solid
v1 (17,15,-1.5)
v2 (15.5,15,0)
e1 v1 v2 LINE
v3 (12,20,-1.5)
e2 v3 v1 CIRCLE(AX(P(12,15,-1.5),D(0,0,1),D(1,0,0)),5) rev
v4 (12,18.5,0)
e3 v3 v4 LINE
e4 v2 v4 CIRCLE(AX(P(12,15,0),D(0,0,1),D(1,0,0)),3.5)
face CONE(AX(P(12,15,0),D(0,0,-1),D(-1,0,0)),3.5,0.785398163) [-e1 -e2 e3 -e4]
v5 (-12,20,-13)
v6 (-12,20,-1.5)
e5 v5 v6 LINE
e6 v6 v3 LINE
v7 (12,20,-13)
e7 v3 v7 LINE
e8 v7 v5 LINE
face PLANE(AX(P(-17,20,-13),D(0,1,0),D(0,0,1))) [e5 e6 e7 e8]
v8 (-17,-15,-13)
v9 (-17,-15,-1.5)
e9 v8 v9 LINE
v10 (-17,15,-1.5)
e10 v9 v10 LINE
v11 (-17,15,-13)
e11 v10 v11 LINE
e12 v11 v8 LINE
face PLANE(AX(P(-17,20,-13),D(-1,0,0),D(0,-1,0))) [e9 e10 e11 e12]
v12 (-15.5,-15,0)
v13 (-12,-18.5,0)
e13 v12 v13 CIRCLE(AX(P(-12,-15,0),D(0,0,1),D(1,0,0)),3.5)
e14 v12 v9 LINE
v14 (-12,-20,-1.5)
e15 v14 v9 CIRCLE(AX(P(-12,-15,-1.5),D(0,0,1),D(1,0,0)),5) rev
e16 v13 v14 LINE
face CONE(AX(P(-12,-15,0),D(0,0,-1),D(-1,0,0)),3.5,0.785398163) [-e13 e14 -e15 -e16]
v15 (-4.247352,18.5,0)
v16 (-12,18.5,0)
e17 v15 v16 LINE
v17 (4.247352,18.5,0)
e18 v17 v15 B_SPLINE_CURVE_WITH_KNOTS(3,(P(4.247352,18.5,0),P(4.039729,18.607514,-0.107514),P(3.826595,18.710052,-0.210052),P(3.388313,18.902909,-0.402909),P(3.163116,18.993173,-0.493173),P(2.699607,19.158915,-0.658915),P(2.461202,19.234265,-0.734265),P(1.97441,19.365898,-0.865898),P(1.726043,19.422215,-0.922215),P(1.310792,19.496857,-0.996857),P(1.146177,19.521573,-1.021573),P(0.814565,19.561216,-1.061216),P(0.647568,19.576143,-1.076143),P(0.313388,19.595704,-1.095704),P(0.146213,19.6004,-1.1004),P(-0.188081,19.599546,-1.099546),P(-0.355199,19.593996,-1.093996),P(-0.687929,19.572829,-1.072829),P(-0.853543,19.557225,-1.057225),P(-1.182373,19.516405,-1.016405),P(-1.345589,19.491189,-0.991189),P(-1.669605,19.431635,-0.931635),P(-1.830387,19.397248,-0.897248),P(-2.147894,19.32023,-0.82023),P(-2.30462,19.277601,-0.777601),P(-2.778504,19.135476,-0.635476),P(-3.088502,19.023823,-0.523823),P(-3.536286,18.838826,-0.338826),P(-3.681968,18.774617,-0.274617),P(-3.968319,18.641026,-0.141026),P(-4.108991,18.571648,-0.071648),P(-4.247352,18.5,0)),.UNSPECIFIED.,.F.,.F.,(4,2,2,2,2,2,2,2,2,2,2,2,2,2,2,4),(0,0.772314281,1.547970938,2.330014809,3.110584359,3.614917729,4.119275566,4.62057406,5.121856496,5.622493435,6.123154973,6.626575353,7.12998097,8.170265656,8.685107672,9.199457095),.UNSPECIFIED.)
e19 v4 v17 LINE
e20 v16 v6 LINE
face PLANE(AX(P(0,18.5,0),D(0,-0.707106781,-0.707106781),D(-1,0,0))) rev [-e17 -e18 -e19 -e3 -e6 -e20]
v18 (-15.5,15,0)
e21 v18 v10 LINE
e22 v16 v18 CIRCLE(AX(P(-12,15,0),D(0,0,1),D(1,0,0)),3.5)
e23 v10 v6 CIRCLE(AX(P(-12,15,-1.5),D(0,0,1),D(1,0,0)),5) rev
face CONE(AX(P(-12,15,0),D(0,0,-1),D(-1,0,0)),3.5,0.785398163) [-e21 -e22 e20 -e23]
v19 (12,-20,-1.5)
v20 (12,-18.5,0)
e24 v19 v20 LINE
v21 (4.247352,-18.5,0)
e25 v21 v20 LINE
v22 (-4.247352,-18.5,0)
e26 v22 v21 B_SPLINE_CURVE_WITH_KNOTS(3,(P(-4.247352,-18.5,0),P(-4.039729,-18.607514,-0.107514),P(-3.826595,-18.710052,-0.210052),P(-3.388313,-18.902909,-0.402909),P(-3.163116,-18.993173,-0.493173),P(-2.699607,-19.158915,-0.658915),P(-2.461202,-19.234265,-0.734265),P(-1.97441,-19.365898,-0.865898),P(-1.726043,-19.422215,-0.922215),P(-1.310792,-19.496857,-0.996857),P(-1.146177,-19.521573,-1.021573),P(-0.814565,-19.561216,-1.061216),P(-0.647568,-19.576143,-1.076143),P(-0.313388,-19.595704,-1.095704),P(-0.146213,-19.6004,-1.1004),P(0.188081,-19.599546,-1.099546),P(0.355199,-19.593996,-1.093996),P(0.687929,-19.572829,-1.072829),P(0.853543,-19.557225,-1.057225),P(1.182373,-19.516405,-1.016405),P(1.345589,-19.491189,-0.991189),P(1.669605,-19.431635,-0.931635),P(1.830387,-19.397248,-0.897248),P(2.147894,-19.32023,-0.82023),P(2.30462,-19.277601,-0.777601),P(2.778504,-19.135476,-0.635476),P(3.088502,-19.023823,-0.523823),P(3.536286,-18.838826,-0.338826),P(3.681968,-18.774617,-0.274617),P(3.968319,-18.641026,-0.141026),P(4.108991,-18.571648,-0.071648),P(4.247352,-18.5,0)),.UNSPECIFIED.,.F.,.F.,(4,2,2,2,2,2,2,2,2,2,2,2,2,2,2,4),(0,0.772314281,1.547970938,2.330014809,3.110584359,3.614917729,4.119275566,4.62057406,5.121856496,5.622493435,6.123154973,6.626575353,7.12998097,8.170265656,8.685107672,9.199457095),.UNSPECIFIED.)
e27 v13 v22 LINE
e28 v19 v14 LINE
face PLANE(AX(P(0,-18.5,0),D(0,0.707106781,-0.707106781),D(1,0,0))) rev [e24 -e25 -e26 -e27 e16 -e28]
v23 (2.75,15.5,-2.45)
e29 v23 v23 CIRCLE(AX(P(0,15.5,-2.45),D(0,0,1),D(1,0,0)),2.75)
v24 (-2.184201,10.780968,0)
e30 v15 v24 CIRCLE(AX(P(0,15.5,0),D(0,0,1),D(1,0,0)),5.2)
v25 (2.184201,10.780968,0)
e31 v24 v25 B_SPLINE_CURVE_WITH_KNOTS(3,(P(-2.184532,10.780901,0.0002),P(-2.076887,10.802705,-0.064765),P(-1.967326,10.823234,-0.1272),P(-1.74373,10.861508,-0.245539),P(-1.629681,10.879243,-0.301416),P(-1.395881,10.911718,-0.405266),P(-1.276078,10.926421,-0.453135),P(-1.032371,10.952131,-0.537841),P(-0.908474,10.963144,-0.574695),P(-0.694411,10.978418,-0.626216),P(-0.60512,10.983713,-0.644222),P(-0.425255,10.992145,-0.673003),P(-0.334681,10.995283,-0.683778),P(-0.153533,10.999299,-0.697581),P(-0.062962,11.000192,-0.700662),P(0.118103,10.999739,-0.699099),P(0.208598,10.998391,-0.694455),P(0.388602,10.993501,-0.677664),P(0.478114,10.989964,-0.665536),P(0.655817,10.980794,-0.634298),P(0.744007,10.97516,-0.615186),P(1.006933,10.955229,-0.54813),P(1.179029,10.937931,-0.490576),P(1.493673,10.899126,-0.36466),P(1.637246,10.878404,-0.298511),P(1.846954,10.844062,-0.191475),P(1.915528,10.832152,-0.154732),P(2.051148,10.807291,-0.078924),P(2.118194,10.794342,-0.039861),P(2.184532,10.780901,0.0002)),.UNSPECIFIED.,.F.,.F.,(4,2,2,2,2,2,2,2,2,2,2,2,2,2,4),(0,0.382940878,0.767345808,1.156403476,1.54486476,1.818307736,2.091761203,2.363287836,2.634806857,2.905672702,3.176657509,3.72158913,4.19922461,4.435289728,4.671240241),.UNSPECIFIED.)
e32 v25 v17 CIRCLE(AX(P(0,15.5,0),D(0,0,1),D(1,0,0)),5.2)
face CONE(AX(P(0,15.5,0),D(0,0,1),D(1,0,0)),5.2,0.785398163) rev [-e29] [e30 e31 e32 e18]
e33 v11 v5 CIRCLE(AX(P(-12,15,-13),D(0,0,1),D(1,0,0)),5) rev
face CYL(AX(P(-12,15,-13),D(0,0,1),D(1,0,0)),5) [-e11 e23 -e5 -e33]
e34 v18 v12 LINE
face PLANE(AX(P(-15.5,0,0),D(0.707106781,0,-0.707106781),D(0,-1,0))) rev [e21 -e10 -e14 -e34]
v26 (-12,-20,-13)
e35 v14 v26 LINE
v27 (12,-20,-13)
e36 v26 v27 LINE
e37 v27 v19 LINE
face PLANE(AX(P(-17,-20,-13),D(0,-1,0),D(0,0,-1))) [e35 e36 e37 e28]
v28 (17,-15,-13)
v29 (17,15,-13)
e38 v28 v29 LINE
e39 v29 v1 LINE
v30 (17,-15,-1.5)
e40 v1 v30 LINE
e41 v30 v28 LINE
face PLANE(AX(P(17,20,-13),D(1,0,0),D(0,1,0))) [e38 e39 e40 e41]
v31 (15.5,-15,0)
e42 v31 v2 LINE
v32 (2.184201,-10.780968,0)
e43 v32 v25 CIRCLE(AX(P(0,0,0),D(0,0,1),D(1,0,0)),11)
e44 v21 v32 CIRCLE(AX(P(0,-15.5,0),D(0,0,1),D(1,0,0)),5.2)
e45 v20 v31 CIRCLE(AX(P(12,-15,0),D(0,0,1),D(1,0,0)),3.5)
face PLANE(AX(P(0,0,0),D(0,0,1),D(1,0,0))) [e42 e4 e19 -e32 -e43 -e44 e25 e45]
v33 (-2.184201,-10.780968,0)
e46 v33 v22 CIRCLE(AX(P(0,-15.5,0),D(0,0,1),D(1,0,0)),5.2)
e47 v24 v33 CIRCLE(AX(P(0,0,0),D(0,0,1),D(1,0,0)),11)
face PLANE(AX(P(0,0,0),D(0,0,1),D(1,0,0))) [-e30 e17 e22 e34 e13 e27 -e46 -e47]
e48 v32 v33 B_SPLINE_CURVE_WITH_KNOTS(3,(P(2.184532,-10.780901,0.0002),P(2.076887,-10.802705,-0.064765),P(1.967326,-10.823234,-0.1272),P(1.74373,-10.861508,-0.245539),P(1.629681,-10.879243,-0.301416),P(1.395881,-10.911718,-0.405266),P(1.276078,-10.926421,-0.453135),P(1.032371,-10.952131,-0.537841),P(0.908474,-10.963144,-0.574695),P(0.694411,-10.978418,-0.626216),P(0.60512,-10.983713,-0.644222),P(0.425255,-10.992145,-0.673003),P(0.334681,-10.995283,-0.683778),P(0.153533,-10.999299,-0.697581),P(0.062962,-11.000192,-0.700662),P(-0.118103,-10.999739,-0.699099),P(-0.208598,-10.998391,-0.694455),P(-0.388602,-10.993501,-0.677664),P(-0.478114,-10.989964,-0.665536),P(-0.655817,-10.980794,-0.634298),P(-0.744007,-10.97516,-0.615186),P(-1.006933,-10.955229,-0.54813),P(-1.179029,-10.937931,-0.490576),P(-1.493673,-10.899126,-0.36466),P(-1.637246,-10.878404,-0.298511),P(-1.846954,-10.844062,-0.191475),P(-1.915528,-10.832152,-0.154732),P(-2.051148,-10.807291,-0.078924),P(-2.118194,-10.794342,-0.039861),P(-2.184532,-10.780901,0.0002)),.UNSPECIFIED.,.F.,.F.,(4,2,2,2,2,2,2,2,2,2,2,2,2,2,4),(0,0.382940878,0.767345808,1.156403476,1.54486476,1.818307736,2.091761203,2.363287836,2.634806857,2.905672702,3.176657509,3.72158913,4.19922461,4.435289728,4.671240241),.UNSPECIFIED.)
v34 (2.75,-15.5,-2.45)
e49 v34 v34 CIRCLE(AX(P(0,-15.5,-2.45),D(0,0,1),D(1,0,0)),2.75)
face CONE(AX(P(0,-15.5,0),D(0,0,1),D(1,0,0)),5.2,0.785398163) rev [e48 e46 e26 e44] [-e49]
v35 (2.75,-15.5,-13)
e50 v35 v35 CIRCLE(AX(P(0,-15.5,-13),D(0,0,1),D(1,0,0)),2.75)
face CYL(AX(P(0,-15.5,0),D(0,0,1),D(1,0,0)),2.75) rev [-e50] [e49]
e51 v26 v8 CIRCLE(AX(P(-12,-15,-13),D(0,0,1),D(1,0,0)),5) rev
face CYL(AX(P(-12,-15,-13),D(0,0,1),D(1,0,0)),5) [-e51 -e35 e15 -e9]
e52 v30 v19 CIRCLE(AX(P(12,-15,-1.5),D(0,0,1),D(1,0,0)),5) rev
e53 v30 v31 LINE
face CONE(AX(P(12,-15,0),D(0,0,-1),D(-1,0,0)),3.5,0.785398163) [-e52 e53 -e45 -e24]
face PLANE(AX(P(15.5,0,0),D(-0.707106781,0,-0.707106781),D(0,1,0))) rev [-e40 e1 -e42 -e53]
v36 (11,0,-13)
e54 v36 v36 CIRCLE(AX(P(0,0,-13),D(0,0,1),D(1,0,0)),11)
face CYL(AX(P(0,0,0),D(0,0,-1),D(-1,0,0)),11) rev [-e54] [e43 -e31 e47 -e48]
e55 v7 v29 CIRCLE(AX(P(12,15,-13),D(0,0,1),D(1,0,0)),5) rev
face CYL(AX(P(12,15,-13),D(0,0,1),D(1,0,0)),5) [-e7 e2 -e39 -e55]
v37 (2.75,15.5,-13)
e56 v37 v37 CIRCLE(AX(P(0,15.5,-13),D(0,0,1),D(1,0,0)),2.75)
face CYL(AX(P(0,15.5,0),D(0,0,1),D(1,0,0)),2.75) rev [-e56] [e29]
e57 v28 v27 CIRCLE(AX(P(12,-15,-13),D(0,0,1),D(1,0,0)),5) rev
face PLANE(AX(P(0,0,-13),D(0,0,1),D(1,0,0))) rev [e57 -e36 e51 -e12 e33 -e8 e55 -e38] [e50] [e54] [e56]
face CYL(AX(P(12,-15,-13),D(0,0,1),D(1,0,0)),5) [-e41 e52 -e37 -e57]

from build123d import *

# Parameters (mm, degrees)
SKETCH_1_W                 = 34
SKETCH_1_H                 = 40
EXTRUDE_273_DEPTH          = 13
SKETCH_2_R                 = 11
CUT_EXTRUDE_457_DEPTH      = 13
HOLE_WIZARD_M6_D           = 5.5
HOLE_WIZARD_M6_CSINK_D     = 10.4
HOLE_WIZARD_M6_CSINK_ANGLE = 90
FILLET_1404_R              = 5
CHAMFER_1_SIZE             = 1.5


with BuildPart() as part:
    # Эскиз1 → Extrude 273 (new body)
    with BuildSketch(Plane.XY):
        Rectangle(SKETCH_1_W, SKETCH_1_H)
    extrude(amount=-EXTRUDE_273_DEPTH)

    # Эскиз2 → Cut-Extrude 457 (cut)
    with BuildSketch(Plane.XY.offset(-13)):
        with Locations(Location((0, 0, 0), (0, 0, 180))):
            Circle(SKETCH_2_R)
    extrude(amount=CUT_EXTRUDE_457_DEPTH, mode=Mode.SUBTRACT)

    # КреплениеM6 (through all)
    with Locations(Plane.XY):
        with Locations((0, 15.5), (0, -15.5)):
            CounterSinkHole(HOLE_WIZARD_M6_D / 2, HOLE_WIZARD_M6_CSINK_D / 2, counter_sink_angle=HOLE_WIZARD_M6_CSINK_ANGLE)

    # Fillet 1404
    fillet_1404_edges = [part.edges().sort_by_distance(p)[0] for p in [
        (17, -20, -6.5),
        (-17, -20, -6.5),
        (-17, 20, -6.5),
        (17, 20, -6.5),
    ]]
    fillet(fillet_1404_edges, radius=FILLET_1404_R)

    # Фаска1
    # the kernel refuses this chamfer: 1.5 mm, written as the material it takes off along each edge
    with BuildSketch(Plane(origin=(-12, -15, 0), x_dir=(-1, 0, 0), z_dir=(0, 1, 0))) as chamfer_1_piece_1:
        Polygon((5 - CHAMFER_1_SIZE, 0), (5, -CHAMFER_1_SIZE), (5, 0), align=None)
    revolve(axis=Axis((-12, -15, 0), (0, 0, 1)), revolution_arc=90, mode=Mode.SUBTRACT)
    with BuildSketch(Plane(origin=(1.251761638, -20, 0), x_dir=(0, 0.9996219169112968, 0.02749587661058636), z_dir=(-1, 0, 0)), Plane(origin=(12, -20, 0), x_dir=(0, 0.9996219169112968, 0.02749587661058636), z_dir=(-1, 0, 0))) as chamfer_1_piece_2:
        Polygon((CHAMFER_1_SIZE * 0.999621916911, CHAMFER_1_SIZE * 0.0274958766106), (-CHAMFER_1_SIZE * 0.0274958766106, CHAMFER_1_SIZE * 0.999621916911), (0, 0), align=None)
    extrude(amount=13.251761638, mode=Mode.SUBTRACT)
    with BuildSketch(Plane(origin=(12, -15, 0), x_dir=(0, -1, 0), z_dir=(-1, 0, 0))) as chamfer_1_piece_3:
        Polygon((5 - CHAMFER_1_SIZE, 0), (5, -CHAMFER_1_SIZE), (5, 0), align=None)
    revolve(axis=Axis((12, -15, 0), (0, 0, 1)), revolution_arc=90, mode=Mode.SUBTRACT)
    with BuildSketch(Plane(origin=(17, 15, 0), x_dir=(-0.9996219169112968, 0, 0.02749587661058636), z_dir=(0, -1, 0)), Plane(origin=(-17, -15, 0), x_dir=(0.9996219169112968, 0, 0.02749587661058636), z_dir=(0, 1, 0))) as chamfer_1_piece_4:
        Polygon((CHAMFER_1_SIZE * 0.999621916911, CHAMFER_1_SIZE * 0.0274958766106), (-CHAMFER_1_SIZE * 0.0274958766106, CHAMFER_1_SIZE * 0.999621916911), (0, 0), align=None)
    extrude(amount=30, mode=Mode.SUBTRACT)
    with BuildSketch(Plane(origin=(12, 15, 0), x_dir=(0, 1, 0), z_dir=(-1, 0, 0))) as chamfer_1_piece_5:
        Polygon((5 - CHAMFER_1_SIZE, 0), (5, CHAMFER_1_SIZE), (5, 0), align=None)
    revolve(axis=Axis((12, 15, 0), (0, 0, -1)), revolution_arc=90, mode=Mode.SUBTRACT)
    with BuildSketch(Plane(origin=(-12, 20, 0), x_dir=(0, 0.027495876610586778, -0.9996219169112968), z_dir=(1, 0, 0)), Plane(origin=(-1.251761638, 20, 0), x_dir=(0, 0.027495876610586778, -0.9996219169112968), z_dir=(1, 0, 0))) as chamfer_1_piece_6:
        Polygon((CHAMFER_1_SIZE * 0.999621916911, -CHAMFER_1_SIZE * 0.0274958766106), (-CHAMFER_1_SIZE * 0.0274958766106, -CHAMFER_1_SIZE * 0.999621916911), (0, 0), align=None)
    extrude(amount=13.251761638, mode=Mode.SUBTRACT)
    with BuildSketch(Plane(origin=(-12, 15, 0), x_dir=(0, 1, 0), z_dir=(1, 0, 0))) as chamfer_1_piece_7:
        Polygon((5 - CHAMFER_1_SIZE, 0), (5, -CHAMFER_1_SIZE), (5, 0), align=None)
    revolve(axis=Axis((-12, 15, 0), (0, 0, 1)), revolution_arc=90, mode=Mode.SUBTRACT)


solid = part.part
